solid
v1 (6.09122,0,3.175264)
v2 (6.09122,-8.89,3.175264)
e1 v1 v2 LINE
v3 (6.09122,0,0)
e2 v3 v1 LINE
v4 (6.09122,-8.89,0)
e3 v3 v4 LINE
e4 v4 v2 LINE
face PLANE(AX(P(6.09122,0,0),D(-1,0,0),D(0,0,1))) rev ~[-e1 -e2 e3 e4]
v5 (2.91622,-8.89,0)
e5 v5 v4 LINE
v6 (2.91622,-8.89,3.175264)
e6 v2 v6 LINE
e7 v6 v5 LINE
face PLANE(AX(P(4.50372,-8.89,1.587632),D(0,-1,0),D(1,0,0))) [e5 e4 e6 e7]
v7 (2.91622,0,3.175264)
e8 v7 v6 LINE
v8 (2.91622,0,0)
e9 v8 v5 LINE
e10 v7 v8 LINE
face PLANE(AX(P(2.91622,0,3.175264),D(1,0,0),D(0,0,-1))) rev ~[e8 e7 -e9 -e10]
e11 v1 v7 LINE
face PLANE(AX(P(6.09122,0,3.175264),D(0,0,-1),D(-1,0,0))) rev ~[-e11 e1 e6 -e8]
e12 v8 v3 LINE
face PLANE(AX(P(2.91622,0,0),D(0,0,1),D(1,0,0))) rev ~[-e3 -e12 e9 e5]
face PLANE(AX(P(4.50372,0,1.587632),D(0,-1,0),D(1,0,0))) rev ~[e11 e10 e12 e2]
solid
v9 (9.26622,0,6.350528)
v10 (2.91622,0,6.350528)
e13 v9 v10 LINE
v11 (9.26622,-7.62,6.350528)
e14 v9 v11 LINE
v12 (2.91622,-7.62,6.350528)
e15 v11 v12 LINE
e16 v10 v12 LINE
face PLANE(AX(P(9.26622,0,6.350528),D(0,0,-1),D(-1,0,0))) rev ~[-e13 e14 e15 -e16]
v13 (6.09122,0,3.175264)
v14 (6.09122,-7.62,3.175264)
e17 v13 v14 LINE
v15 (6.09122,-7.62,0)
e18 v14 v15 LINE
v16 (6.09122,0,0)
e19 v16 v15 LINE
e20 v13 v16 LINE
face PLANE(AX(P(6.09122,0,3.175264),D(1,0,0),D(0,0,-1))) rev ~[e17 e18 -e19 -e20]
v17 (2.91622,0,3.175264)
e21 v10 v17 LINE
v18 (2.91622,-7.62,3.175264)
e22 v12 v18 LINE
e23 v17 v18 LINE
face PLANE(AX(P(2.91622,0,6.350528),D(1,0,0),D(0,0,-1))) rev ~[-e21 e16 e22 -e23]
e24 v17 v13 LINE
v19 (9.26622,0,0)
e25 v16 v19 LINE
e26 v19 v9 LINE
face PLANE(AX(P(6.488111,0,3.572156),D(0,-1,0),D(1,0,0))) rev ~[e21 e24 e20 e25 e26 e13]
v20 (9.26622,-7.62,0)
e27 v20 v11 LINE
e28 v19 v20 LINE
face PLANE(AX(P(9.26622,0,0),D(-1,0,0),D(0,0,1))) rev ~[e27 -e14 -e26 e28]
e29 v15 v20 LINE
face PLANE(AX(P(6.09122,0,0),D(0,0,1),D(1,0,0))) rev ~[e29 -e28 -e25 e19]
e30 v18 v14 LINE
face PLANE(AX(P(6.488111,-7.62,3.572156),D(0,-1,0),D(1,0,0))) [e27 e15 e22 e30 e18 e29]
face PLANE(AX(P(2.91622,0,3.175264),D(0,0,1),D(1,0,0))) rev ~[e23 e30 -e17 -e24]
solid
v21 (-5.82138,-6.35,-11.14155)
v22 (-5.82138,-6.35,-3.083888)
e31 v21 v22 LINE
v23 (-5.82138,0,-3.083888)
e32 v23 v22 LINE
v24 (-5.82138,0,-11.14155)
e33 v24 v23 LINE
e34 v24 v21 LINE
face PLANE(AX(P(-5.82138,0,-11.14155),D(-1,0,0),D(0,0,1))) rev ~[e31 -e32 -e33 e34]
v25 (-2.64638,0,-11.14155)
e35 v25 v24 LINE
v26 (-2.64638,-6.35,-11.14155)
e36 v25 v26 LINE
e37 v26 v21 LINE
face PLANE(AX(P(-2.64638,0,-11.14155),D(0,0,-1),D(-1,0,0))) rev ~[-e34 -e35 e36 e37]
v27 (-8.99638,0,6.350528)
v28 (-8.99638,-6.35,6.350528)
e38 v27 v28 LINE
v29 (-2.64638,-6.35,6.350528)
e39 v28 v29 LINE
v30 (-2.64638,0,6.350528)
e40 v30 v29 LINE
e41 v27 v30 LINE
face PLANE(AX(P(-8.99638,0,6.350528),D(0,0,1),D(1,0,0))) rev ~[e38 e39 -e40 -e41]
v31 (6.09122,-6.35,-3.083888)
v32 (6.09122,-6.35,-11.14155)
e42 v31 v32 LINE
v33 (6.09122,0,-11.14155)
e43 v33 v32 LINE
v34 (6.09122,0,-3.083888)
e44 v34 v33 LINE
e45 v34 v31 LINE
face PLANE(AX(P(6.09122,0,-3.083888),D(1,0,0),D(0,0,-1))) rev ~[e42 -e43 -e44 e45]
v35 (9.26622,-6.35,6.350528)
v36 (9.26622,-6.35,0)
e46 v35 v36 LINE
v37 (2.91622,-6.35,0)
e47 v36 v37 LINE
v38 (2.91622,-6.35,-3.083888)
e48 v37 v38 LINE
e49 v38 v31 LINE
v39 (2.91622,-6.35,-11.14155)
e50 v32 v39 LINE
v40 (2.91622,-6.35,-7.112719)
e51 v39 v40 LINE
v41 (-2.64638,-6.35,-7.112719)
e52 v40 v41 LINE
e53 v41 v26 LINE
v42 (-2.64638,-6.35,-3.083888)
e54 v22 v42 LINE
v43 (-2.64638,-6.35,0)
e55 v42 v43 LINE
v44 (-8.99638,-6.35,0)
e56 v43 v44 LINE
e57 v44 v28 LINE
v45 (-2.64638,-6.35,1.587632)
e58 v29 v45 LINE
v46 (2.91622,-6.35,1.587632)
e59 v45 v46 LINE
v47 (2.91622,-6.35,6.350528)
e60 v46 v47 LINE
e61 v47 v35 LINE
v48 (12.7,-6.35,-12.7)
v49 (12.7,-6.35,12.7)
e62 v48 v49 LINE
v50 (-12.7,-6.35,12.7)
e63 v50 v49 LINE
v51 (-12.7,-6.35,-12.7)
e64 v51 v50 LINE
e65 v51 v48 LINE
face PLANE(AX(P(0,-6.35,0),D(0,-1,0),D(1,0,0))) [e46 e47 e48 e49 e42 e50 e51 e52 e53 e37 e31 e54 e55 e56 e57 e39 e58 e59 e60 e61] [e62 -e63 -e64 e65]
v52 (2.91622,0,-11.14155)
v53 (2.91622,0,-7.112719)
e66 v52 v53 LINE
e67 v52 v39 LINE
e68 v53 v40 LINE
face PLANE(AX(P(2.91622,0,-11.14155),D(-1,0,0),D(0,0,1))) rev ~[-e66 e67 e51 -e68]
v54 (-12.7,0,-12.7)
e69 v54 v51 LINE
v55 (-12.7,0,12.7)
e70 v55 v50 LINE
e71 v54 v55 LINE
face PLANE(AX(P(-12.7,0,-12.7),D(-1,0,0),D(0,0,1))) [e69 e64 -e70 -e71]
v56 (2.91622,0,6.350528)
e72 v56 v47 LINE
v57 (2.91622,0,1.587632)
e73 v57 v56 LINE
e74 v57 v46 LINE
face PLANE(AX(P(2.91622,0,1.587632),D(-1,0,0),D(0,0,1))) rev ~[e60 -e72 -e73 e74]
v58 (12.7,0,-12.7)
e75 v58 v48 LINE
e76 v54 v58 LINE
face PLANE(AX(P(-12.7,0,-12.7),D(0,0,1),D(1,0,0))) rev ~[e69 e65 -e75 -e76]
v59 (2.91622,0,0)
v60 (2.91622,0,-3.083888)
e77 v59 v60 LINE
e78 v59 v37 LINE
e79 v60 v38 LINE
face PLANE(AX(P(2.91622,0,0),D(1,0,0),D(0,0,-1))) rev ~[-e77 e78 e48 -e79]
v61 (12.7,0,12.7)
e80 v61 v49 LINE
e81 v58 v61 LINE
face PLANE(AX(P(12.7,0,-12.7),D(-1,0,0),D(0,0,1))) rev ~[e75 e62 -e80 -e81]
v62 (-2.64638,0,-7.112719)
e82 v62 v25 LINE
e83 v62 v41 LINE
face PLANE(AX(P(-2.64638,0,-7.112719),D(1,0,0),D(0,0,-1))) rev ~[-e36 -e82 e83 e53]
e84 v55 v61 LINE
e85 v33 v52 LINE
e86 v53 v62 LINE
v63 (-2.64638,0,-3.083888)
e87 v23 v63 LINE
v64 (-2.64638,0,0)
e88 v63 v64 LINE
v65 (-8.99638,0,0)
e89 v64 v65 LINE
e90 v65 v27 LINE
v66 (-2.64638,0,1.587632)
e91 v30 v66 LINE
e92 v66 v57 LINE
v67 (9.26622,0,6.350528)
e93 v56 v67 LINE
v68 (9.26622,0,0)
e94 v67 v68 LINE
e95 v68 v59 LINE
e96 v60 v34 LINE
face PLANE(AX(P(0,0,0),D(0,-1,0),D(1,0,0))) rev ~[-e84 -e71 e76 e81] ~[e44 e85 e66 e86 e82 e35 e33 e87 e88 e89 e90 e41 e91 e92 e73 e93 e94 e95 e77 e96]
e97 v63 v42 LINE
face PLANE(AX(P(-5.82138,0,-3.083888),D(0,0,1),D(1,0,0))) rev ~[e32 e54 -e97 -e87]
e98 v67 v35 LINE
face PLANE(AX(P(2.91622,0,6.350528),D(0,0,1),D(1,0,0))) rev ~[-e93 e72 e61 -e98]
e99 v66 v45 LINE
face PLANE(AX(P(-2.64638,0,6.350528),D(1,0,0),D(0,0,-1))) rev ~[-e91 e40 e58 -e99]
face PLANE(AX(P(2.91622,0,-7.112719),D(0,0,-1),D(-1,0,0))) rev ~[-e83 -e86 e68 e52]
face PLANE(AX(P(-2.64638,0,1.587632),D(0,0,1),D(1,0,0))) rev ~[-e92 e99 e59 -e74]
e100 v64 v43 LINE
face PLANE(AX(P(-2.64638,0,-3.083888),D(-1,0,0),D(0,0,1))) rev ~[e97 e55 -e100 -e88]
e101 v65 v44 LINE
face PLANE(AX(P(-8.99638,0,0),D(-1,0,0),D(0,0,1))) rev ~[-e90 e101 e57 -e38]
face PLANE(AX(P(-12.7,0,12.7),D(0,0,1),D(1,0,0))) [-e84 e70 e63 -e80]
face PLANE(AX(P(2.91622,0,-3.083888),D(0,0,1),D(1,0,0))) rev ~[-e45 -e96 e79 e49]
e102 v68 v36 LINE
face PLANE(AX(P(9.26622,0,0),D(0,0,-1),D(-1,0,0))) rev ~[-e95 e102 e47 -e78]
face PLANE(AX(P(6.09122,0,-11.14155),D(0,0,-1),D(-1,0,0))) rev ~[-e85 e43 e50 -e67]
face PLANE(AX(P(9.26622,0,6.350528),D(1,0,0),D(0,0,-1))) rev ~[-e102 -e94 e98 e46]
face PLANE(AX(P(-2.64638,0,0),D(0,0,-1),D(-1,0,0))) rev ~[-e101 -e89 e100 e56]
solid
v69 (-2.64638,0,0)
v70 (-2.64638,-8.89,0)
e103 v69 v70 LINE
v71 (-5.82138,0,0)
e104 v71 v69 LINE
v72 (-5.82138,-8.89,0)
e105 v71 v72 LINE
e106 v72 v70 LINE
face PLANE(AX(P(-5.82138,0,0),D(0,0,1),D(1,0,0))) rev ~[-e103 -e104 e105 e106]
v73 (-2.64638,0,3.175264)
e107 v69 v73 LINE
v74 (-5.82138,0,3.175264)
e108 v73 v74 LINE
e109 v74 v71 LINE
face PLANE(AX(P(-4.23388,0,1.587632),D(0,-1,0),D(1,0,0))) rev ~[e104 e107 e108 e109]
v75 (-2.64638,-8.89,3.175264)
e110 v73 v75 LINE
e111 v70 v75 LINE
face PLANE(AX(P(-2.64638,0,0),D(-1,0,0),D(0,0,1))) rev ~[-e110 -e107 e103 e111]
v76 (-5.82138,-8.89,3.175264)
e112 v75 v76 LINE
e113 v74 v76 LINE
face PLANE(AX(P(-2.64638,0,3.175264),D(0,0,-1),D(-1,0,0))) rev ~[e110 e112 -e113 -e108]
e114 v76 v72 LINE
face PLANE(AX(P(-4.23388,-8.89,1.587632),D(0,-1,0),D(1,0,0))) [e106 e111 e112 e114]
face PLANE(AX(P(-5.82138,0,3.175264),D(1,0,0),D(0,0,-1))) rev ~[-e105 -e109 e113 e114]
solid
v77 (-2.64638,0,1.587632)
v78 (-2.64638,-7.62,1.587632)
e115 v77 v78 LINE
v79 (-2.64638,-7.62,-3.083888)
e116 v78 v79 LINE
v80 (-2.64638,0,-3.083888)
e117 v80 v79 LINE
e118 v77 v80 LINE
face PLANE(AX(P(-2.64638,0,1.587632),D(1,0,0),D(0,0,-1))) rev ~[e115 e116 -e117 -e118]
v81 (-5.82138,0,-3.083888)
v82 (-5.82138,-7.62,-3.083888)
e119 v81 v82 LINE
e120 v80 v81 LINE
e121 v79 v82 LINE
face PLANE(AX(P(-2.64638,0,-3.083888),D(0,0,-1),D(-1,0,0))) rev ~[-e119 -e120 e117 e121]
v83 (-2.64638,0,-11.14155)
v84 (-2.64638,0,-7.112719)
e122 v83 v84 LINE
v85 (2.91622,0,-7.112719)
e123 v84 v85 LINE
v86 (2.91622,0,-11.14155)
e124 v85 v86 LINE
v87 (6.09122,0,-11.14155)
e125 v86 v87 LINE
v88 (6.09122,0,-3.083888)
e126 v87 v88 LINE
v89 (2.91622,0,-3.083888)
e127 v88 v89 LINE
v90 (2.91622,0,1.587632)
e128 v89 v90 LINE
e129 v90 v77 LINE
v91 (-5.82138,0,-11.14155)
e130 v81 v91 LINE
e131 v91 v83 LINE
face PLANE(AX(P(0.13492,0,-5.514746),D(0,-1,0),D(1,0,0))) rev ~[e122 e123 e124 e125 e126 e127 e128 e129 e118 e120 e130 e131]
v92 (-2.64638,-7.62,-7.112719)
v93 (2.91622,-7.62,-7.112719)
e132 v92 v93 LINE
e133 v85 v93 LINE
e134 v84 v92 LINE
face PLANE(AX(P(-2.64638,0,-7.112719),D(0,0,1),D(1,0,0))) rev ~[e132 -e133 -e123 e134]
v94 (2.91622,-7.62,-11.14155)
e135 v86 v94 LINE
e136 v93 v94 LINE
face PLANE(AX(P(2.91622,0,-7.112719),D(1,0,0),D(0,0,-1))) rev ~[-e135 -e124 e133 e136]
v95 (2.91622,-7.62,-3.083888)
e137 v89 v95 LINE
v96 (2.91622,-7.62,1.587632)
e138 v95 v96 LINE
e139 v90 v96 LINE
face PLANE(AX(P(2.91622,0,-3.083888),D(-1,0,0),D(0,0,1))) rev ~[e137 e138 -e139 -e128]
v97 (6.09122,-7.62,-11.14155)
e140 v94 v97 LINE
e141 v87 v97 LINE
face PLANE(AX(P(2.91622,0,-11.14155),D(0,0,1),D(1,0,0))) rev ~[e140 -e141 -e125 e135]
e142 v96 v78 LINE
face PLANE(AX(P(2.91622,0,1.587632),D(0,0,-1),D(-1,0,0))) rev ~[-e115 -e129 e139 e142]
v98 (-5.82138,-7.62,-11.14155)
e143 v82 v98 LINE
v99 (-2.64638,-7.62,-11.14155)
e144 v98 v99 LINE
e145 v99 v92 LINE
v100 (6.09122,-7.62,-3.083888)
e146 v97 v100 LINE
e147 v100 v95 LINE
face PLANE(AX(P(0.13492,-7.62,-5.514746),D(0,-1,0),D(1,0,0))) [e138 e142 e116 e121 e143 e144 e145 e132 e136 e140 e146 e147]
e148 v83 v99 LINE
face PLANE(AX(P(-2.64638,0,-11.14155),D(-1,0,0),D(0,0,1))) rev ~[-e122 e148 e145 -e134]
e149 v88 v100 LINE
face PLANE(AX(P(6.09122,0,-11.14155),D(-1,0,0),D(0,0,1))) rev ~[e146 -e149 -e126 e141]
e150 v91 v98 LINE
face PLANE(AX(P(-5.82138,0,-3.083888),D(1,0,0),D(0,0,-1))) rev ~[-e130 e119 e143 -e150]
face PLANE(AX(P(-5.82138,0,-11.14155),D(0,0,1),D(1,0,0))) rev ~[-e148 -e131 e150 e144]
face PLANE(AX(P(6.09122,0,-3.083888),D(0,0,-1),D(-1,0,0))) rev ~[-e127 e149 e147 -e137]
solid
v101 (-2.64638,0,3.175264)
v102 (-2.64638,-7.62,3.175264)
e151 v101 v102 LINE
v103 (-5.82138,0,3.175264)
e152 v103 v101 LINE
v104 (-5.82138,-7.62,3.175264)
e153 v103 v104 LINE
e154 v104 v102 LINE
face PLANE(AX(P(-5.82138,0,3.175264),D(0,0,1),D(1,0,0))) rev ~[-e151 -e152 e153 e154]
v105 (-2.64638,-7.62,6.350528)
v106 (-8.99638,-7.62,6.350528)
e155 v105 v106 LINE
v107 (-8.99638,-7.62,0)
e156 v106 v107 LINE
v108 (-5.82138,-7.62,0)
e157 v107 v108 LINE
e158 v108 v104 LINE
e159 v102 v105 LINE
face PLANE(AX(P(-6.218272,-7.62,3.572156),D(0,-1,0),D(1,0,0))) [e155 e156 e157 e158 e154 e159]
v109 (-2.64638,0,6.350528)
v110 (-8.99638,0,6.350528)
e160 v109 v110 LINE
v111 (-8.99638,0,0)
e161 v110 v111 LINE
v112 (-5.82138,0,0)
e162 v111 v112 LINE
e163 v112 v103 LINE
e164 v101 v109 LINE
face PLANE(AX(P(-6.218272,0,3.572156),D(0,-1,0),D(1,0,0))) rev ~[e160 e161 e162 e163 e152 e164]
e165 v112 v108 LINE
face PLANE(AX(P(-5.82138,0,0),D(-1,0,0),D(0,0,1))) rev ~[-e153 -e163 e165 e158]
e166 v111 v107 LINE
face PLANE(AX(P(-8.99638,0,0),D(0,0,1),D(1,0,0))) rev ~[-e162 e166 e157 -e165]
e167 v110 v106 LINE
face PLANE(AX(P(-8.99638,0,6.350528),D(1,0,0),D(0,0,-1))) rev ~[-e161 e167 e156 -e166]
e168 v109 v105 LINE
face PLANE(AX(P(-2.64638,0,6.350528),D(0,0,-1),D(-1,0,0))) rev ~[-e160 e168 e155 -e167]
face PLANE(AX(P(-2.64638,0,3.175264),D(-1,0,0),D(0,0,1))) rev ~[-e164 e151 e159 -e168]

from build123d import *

# Parameters (mm, degrees)
F1_DEPTH = 7.62
F2_DEPTH = 8.89
F3_DEPTH = 7.62
F0_W     = 25.4
F0_H     = 25.4
F4_DEPTH = 6.35


# Not quite as in the source:
# - a feature names something its author has since deleted; it is built from what else it names


with BuildPart() as f1:
    # F0 (on Front) → F1 (new body)
    with BuildSketch(Plane.XZ):
        Polygon((-8.9963801613, 0), (-5.8213801613, 0), (-5.8213801613, 3.1752641518), (-2.6463801613, 3.1752641518), (-2.6463801613, 6.3505283036), (-8.9963801613, 6.3505283036), align=None)
    extrude(amount=F1_DEPTH)


with BuildPart() as f1b:
    # F0 (on Front) → F1, piece 2 (new body)
    with BuildSketch(Plane.XZ):
        Polygon((2.9162198387, 6.3505283036), (2.9162198387, 3.1752641518), (6.0912198387, 3.1752641518), (6.0912198387, 0), (9.2662198387, 0), (9.2662198387, 6.3505283036), align=None)
    extrude(amount=F1_DEPTH)


with BuildPart() as f2:
    # F0 (on Front) → F2 (new body)
    with BuildSketch(Plane.XZ):
        Polygon((-5.8213801613, 0), (-2.6463801613, 0), (-2.6463801613, 1.5876320759), (-2.6463801613, 3.1752641518), (-5.8213801613, 3.1752641518), align=None)
    extrude(amount=F2_DEPTH)


with BuildPart() as f2b:
    # F0 (on Front) → F2, piece 2 (new body)
    with BuildSketch(Plane.XZ):
        Polygon((2.9162198387, 3.1752641518), (2.9162198387, 1.5876320759), (2.9162198387, 0), (6.0912198387, 0), (6.0912198387, 3.1752641518), align=None)
    extrude(amount=F2_DEPTH)


with BuildPart() as f3:
    # F0 (on Front) → F3 (new body)
    with BuildSketch(Plane.XZ):
        Polygon((-2.6463801613, 1.5876320759), (-2.6463801613, 0), (-2.6463801613, -3.0838879648), (-5.8213801613, -3.0838879648), (-5.8213801613, -11.1415497959), (-2.6463801613, -11.1415497959), (-2.6463801613, -7.1127188803), (2.9162198387, -7.1127188803), (2.9162198387, -11.1415497959), (6.0912198387, -11.1415497959), (6.0912198387, -3.0838879648), (2.9162198387, -3.0838879648), (2.9162198387, 0), (2.9162198387, 1.5876320759), align=None)
    extrude(amount=F3_DEPTH)


with BuildPart() as f4:
    # F0 (on Front) → F4 (new body)
    with BuildSketch(Plane.XZ):
        Rectangle(F0_W, F0_H)
        Polygon((-2.6463801613, -3.0838879648), (-2.6463801613, 0), (-5.8213801613, 0), (-8.9963801613, 0), (-8.9963801613, 6.3505283036), (-2.6463801613, 6.3505283036), (-2.6463801613, 3.1752641518), (-2.6463801613, 1.5876320759), (2.9162198387, 1.5876320759), (2.9162198387, 3.1752641518), (2.9162198387, 6.3505283036), (9.2662198387, 6.3505283036), (9.2662198387, 0), (6.0912198387, 0), (2.9162198387, 0), (2.9162198387, -3.0838879648), (6.0912198387, -3.0838879648), (6.0912198387, -11.1415497959), (2.9162198387, -11.1415497959), (2.9162198387, -7.1127188803), (-2.6463801613, -7.1127188803), (-2.6463801613, -11.1415497959), (-5.8213801613, -11.1415497959), (-5.8213801613, -3.0838879648), align=None, mode=Mode.SUBTRACT)
    extrude(amount=F4_DEPTH)


solid = Compound([f1.part, f1b.part, f2.part, f2b.part, f3.part, f4.part])
